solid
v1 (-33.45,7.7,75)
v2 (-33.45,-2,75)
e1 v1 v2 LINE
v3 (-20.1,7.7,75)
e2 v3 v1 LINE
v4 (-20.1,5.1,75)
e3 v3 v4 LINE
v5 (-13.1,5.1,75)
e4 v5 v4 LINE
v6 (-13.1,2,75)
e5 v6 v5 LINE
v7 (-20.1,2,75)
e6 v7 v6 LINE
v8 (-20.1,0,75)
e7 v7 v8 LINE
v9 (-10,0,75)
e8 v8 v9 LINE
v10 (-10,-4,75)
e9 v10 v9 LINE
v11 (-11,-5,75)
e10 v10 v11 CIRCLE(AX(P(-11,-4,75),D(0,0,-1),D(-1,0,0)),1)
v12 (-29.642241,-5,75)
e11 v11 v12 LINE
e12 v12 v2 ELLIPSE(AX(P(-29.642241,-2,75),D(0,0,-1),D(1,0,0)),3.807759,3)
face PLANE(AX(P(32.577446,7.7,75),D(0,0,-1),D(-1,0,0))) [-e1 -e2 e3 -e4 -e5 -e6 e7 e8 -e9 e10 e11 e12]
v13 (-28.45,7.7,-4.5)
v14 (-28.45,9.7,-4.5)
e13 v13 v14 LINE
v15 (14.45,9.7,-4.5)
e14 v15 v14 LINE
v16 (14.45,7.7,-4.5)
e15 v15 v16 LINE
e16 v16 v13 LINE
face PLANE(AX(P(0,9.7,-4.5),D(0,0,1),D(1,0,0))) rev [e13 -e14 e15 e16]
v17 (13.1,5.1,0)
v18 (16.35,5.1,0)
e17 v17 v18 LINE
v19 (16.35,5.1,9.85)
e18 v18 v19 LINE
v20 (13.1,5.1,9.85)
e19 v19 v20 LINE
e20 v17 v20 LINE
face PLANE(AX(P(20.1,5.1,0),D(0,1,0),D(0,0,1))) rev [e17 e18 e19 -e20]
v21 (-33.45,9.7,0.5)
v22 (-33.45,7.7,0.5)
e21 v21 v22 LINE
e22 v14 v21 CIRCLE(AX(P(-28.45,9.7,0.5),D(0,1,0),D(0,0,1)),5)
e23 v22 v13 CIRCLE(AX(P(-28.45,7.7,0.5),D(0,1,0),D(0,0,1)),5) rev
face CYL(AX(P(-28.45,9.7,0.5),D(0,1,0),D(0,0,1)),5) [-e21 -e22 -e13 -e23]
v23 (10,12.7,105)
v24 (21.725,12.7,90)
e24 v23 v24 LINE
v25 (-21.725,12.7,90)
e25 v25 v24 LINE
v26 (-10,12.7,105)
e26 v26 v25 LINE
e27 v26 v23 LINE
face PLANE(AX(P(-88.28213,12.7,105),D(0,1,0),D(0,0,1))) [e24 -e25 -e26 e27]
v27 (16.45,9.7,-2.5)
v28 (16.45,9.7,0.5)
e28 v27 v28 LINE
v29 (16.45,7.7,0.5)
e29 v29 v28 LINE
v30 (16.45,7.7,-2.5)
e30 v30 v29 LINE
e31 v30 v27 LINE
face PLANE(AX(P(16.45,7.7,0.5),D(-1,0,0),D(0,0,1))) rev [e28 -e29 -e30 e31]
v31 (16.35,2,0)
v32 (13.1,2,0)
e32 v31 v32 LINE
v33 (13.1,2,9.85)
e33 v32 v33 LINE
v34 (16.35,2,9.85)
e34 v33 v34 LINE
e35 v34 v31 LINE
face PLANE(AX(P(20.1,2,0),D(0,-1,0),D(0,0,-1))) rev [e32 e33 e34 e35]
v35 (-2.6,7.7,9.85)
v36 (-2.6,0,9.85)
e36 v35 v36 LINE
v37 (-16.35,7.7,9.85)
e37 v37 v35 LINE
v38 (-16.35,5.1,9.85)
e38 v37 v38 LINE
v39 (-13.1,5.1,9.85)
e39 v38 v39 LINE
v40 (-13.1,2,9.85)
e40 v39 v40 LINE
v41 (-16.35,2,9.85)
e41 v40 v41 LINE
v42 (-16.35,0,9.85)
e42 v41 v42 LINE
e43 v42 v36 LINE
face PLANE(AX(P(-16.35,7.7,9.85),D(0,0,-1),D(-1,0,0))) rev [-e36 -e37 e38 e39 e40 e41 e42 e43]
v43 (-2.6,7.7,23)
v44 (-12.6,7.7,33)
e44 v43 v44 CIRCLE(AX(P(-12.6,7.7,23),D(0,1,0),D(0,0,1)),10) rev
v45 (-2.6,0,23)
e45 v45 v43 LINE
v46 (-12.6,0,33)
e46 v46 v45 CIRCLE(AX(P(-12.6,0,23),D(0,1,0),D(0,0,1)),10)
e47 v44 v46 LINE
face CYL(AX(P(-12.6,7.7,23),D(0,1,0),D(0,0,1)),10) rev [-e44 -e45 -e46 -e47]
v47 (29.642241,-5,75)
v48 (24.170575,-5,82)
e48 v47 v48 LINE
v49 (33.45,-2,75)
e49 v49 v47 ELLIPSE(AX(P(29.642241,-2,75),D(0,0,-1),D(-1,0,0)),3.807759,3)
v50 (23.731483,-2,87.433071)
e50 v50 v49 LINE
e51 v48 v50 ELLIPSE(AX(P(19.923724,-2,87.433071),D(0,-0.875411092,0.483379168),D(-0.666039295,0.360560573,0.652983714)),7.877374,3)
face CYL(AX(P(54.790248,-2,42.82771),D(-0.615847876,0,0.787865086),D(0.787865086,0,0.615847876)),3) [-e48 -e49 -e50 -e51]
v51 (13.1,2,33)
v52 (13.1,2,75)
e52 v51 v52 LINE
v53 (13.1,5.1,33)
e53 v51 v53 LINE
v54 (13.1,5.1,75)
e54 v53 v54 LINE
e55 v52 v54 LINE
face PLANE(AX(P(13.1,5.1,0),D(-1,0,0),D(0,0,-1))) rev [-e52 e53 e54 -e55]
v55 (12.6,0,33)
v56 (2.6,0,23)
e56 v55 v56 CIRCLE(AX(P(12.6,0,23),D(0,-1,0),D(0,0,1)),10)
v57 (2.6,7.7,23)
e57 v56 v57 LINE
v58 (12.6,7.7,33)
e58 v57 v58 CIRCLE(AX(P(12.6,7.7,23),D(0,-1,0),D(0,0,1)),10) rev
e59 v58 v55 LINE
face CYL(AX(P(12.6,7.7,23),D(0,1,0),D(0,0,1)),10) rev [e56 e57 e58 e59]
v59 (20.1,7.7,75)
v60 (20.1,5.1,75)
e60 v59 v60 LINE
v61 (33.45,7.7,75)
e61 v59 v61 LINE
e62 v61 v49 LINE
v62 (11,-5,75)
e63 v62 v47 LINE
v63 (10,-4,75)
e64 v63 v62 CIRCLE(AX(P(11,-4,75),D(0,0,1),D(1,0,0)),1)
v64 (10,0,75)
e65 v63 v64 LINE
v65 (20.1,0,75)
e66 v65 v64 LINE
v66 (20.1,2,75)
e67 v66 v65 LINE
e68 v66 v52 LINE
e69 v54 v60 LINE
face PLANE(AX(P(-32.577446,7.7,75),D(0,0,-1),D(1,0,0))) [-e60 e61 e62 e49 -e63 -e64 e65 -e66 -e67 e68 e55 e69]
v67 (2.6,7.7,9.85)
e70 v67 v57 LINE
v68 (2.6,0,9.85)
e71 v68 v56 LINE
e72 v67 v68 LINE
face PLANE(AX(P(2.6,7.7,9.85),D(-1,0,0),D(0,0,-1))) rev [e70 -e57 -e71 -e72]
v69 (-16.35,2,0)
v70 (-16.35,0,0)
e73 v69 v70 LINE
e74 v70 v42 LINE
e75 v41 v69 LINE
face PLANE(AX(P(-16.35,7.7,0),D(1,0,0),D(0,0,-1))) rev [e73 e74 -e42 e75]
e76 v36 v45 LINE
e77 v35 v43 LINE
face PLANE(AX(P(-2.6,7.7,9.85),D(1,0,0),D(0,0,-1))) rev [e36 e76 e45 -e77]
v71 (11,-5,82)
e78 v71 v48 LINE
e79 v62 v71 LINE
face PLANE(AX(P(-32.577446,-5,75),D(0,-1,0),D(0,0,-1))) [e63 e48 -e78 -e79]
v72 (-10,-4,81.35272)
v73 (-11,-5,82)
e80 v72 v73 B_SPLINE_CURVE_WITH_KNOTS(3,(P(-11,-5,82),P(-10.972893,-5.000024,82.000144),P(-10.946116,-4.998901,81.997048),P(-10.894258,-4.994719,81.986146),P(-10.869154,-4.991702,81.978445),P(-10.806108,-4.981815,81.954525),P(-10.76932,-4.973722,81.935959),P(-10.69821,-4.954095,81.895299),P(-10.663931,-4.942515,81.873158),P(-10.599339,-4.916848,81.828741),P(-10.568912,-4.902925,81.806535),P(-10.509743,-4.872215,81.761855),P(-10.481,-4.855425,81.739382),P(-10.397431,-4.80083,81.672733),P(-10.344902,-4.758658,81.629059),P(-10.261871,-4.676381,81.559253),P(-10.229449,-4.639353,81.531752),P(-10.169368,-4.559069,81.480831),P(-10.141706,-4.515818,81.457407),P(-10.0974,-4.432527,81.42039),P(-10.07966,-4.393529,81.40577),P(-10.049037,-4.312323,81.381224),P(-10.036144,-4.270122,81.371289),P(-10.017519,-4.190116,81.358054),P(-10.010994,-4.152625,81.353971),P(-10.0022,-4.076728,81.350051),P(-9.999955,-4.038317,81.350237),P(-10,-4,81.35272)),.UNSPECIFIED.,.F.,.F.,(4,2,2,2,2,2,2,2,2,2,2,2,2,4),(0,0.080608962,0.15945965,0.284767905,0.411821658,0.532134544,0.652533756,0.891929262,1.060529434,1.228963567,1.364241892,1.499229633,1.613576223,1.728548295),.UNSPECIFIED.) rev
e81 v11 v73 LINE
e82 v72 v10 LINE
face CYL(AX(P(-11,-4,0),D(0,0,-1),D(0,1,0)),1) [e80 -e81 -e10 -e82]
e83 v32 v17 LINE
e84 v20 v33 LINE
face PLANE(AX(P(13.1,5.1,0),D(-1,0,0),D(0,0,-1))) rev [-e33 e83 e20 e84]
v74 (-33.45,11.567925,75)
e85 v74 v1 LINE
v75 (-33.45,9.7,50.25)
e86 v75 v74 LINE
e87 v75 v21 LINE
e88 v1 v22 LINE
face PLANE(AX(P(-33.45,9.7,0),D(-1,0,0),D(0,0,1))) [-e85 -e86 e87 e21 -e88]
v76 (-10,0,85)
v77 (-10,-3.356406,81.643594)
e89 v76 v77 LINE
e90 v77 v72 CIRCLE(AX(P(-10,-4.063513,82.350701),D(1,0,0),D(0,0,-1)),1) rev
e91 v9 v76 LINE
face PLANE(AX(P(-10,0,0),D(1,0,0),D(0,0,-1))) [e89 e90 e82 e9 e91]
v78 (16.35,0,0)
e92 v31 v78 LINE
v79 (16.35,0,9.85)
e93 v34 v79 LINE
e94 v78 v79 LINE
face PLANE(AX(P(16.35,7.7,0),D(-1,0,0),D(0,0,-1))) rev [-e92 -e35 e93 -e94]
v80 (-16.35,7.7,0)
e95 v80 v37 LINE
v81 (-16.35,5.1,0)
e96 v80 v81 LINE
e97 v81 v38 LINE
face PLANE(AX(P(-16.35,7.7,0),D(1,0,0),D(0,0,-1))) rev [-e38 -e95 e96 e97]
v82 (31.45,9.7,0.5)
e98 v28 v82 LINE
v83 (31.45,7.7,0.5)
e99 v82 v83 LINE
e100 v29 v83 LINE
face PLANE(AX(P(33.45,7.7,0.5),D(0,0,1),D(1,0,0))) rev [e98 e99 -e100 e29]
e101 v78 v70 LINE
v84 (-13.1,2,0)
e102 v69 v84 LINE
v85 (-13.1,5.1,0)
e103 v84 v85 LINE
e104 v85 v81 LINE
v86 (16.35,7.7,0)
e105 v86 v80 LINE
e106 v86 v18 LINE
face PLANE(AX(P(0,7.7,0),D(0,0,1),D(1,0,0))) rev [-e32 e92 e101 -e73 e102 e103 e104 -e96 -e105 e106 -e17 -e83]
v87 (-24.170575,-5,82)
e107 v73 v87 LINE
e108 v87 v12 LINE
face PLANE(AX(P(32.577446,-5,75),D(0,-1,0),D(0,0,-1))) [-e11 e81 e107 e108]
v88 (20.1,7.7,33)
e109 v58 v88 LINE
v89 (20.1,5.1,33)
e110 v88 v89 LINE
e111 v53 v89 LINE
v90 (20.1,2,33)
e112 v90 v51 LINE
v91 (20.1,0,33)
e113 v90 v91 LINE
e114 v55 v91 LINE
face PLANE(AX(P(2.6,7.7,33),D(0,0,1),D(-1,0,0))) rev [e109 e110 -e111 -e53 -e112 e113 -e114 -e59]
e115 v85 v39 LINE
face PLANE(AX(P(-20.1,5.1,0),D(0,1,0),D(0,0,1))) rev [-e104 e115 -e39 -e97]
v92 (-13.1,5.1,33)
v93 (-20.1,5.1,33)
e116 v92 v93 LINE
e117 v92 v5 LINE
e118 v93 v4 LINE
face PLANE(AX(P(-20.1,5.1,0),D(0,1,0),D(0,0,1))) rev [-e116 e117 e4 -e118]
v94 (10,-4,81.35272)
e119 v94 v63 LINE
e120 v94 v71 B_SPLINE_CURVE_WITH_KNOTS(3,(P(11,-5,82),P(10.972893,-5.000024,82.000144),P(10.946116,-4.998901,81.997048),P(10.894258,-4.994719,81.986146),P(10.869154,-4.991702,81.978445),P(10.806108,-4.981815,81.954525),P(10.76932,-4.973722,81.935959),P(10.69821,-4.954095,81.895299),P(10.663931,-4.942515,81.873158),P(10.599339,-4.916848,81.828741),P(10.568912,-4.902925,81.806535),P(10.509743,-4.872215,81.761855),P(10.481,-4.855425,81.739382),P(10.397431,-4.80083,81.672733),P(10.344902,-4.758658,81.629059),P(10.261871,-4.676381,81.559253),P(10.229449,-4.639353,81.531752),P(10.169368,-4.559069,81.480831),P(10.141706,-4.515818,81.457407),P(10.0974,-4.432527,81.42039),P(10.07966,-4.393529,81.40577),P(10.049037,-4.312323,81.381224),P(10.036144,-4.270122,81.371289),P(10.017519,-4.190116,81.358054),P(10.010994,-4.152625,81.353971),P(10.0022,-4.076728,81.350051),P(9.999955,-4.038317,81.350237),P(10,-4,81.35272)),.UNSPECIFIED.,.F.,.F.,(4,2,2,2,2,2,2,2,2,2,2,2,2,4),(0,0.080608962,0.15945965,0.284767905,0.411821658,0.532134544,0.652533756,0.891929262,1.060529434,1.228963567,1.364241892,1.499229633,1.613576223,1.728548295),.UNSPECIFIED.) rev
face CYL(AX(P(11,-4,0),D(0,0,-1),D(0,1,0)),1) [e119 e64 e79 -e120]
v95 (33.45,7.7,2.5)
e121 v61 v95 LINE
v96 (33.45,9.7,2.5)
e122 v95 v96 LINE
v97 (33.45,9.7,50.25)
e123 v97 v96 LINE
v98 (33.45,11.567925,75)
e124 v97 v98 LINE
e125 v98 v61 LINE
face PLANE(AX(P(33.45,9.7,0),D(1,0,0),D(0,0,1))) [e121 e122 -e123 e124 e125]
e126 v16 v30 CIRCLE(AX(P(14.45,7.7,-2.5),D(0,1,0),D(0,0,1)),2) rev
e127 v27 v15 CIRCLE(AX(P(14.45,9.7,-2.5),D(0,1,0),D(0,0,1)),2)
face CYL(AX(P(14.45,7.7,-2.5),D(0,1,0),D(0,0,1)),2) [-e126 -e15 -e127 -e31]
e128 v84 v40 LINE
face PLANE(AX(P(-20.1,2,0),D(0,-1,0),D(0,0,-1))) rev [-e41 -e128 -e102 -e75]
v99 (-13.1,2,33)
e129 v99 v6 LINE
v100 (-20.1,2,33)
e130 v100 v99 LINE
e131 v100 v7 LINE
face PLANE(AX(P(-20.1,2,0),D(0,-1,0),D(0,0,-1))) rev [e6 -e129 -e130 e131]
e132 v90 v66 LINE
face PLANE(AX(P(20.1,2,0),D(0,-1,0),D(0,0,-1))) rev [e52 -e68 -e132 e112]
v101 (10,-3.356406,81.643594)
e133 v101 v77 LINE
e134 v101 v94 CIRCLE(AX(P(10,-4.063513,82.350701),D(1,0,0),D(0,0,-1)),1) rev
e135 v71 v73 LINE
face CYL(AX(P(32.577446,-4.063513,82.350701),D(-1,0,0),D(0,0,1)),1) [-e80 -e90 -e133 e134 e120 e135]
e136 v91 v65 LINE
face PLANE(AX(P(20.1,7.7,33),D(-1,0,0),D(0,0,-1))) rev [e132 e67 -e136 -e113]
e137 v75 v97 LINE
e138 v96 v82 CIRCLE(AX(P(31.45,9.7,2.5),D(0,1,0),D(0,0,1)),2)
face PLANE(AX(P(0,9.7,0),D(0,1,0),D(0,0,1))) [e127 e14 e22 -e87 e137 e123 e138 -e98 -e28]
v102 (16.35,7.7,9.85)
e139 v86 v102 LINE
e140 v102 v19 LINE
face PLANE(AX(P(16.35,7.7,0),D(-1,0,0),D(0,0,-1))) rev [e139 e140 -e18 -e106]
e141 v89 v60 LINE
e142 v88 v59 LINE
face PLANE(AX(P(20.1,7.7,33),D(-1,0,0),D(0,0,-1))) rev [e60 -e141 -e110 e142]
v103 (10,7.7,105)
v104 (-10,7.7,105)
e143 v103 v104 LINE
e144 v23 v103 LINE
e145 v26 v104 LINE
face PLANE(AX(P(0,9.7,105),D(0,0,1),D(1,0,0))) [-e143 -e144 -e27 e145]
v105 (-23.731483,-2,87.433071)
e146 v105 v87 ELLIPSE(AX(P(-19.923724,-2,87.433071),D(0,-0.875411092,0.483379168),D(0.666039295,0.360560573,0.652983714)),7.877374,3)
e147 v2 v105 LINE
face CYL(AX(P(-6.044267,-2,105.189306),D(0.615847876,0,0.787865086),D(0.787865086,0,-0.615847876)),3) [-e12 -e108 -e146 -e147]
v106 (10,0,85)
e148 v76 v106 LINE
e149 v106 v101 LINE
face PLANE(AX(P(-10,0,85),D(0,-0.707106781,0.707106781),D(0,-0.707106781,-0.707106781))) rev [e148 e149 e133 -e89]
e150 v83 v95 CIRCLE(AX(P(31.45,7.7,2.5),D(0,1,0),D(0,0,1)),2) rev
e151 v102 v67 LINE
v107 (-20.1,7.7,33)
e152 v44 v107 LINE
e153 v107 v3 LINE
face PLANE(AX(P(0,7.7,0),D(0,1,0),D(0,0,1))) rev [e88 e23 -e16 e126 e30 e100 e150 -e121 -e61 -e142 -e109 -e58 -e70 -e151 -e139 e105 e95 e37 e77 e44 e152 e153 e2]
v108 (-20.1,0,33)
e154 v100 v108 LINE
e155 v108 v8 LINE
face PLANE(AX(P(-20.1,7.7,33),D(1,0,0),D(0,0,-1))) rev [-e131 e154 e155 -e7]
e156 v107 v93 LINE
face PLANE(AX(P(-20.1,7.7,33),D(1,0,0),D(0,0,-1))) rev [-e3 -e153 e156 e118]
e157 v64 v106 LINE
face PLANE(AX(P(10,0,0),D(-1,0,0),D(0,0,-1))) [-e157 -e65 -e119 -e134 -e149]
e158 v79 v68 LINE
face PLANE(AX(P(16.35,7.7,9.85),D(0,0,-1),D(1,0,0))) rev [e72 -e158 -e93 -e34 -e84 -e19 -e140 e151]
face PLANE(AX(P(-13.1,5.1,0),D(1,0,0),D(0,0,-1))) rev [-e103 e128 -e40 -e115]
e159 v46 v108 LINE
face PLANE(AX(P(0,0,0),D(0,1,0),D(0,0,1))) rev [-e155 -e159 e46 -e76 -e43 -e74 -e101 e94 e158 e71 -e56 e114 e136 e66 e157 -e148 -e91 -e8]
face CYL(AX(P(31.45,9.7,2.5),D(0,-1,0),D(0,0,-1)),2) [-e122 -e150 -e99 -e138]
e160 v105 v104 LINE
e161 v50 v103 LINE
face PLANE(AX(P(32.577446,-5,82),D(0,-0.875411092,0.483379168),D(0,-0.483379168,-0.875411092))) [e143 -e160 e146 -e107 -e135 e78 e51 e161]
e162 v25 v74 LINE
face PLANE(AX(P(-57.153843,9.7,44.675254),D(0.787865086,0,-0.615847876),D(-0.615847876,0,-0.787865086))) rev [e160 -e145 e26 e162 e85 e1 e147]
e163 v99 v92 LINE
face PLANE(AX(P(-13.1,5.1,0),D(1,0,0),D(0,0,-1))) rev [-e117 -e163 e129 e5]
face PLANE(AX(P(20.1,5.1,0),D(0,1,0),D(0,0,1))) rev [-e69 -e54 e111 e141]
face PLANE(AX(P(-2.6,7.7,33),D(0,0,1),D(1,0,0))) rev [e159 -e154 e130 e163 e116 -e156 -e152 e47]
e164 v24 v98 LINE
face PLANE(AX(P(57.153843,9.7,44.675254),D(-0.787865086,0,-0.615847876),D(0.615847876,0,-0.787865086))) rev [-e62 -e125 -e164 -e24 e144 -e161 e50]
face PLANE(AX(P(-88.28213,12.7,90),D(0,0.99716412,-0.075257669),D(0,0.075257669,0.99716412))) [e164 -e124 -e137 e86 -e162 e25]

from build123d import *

# Parameters (mm, degrees)
BOSS_EXTRUDE1_DEPTH     = 7.7
SKETCH2_W               = 7
SKETCH2_H               = 3.1
CUT_EXTRUDE1_DEPTH      = 79.027559234
FILLET1_R               = 10
BOSS_EXTRUDE2_DEPTH     = 2
BOSS_EXTRUDE3_DEPTH     = 33.45
BOSS_EXTRUDE4_REACH     = 112.929
CUT_EXTRUDE2_DEPTH      = 111.928772192
CUT_EXTRUDE2_DEPTH_BACK = 111.928772192
CUT_EXTRUDE3_DEPTH      = 10
FILLET3_R               = 1
FILLET5_R               = 3
SKETCH8_W               = 17
SKETCH8_H               = 5
CUT_EXTRUDE4_DEPTH      = 2
FILLET6_R               = 5
FILLET7_R               = 2


with BuildPart() as part:
    # Sketch1 → Boss-Extrude1 (new body)
    with BuildSketch(Plane(origin=(0, 0, 0), x_dir=(1, 0, 0), z_dir=(0, 1, 0))):
        Polygon((0, 0), (-16.35, 0), (-16.35, -9.85), (-2.6, -9.85), (-2.6, -33), (-20.1, -33), (-20.1, -75), (0, -75), align=None)
    extrude(amount=BOSS_EXTRUDE1_DEPTH)

    # Sketch2 → Cut-Extrude1 (cut, through all)
    with BuildSketch(Plane.XY.offset(75)):
        with Locations((-16.6, 3.55)):
            Rectangle(SKETCH2_W, SKETCH2_H)
    extrude(amount=-CUT_EXTRUDE1_DEPTH, mode=Mode.SUBTRACT)

    # Fillet1
    fillet1_edges = [part.edges().sort_by_distance(p)[0] for p in [
        (-2.6, 3.85, 33),
    ]]
    fillet(fillet1_edges, radius=FILLET1_R)

    # Sketch3 → Boss-Extrude2 (add)
    with BuildSketch(Plane(origin=(0, 7.7, 0), x_dir=(1, 0, 0), z_dir=(0, 1, 0))):
        Polygon((0, 4.5), (-33.45, 4.5), (-33.45, -75), (-10, -105), (0, -105), align=None)
    extrude(amount=BOSS_EXTRUDE2_DEPTH)

    # Sketch4 → Boss-Extrude3 (add)
    with BuildSketch(Plane(origin=(0, 0, 0), x_dir=(0, 0, -1), z_dir=(1, 0, 0))):
        Polygon((-105, 9.7), (-105, 12.7), (-90, 12.7), (-50.25, 9.7), align=None)
    extrude(amount=-BOSS_EXTRUDE3_DEPTH)

    # Boss-Extrude4: up to this face of the body (flat: up to its plane)
    boss_extrude4_end = Plane(part.part.faces().sort_by_distance((0, 5.848980441, 46.191947566))[0])
    # Sketch5 → Boss-Extrude4 (add, up to the picked face)
    with BuildSketch(Plane.ZY.offset(33.45), mode=Mode.PRIVATE) as boss_extrude4_sk1:
        Polygon((75, 7.7), (75, -5), (82, -5), (105, 7.7), align=None)
    boss_extrude4_tool1 = split(extrude(boss_extrude4_sk1.sketch, amount=-BOSS_EXTRUDE4_REACH, mode=Mode.PRIVATE), bisect_by=boss_extrude4_end, keep=Keep.BOTH, mode=Mode.PRIVATE)
    add(boss_extrude4_tool1.solids().sort_by(Axis((-33.45, 2.665766, 85.441441), (1, 0, 0)))[0])

    # Sketch6 → Cut-Extrude2 (cut, two sides: drawn at the far end of the back side and taken through both)
    with BuildSketch(Plane(origin=(0, 7.7, 0), x_dir=(1, 0, 0), z_dir=(0, 1, 0)).offset(-CUT_EXTRUDE2_DEPTH_BACK)):
        Polygon((-33.45, -75), (-10, -105), (-33.45, -105), align=None)
    extrude(amount=CUT_EXTRUDE2_DEPTH + CUT_EXTRUDE2_DEPTH_BACK, mode=Mode.SUBTRACT)

    # Sketch7 → Cut-Extrude3 (cut)
    with BuildSketch(Plane(origin=(0, 0, 0), x_dir=(0, 0, -1), z_dir=(1, 0, 0))):
        Polygon((-75, 0), (-85, 0), (-80, -5), (-75, -5), align=None)
    extrude(amount=-CUT_EXTRUDE3_DEPTH, mode=Mode.SUBTRACT)

    # Fillet3
    # the kernel refuses this fillet: 1 mm, written as the material it takes off along each edge
    with BuildSketch(Plane(origin=(5.810983209, -5, 80), x_dir=(0, 0, 1), z_dir=(-1, 0, 0))) as fillet3_piece_1:
        with BuildLine():
            CenterArc((2.350701034, 0.936487472), FILLET3_R, 135, 114.469800521)
            Line((1.643594253, 1.643594253), (1.629452117, 1.657736389))
            Line((1.629452117, 1.657736389), (-0.014142136, 0.014142136))
            Line((-0.014142136, 0.014142136), (0, -0.02))
            ThreePointArc((0, -0.02), (1, -0.02), (1.992985979, -0.018729749))
            Line((1.992985979, -0.018729749), (2, 0))
        make_face()
    extrude(amount=15.810983209, mode=Mode.SUBTRACT)
    with BuildSketch(Plane(origin=(-10, -5, 82.5), x_dir=(-1, 0, 0), z_dir=(0, 0, -1))) as fillet3_piece_2_section:
        with BuildLine():
            CenterArc((FILLET3_R, FILLET3_R), FILLET3_R, 180, 90)
            Line((0, FILLET3_R), (-FILLET3_R * 0.02, FILLET3_R))
            Line((-FILLET3_R * 0.02, FILLET3_R), (-FILLET3_R * 0.02, -FILLET3_R * 0.02))
            Line((-FILLET3_R * 0.02, -FILLET3_R * 0.02), (FILLET3_R, -FILLET3_R * 0.02))
            Line((FILLET3_R, -FILLET3_R * 0.02), (FILLET3_R, 0))
        make_face()
    fillet3_piece_2 = extrude(amount=10, mode=Mode.PRIVATE)
    fillet3_piece_2 = split(fillet3_piece_2, bisect_by=Plane(origin=(-10.222841489, -6.700692184, 78.299307816), z_dir=(0, 0.7071067811865466, -0.7071067811865485)), keep=Keep.TOP, mode=Mode.PRIVATE)
    add(fillet3_piece_2, mode=Mode.SUBTRACT)
    with BuildSketch(Plane(origin=(5.810983209, -5, 80), x_dir=(0, 0, 1), z_dir=(-1, 0, 0))) as fillet3_piece_3a_section:
        with BuildLine():
            CenterArc((2.350701034, 0.936487472), FILLET3_R, 135, 114.469800521)
            Line((1.643594253, 1.643594253), (1.629452117, 1.657736389))
            Line((1.629452117, 1.657736389), (-0.014142136, 0.014142136))
            Line((-0.014142136, 0.014142136), (0, -0.02))
            ThreePointArc((0, -0.02), (1, -0.02), (1.992985979, -0.018729749))
            Line((1.992985979, -0.018729749), (2, 0))
        make_face()
    fillet3_piece_3a = extrude(amount=21.621966417, mode=Mode.PRIVATE)
    fillet3_piece_3a = split(fillet3_piece_3a, bisect_by=Plane(origin=(-10, -4.567151235, 80.996776665), z_dir=(-1, 0, 0)), keep=Keep.TOP, mode=Mode.PRIVATE)
    with BuildSketch(Plane(origin=(-10, -5, 82.5), x_dir=(-1, 0, 0), z_dir=(0, 0, -1))) as fillet3_piece_3b_section:
        with BuildLine():
            CenterArc((FILLET3_R, FILLET3_R), FILLET3_R, 180, 90)
            Line((0, FILLET3_R), (-FILLET3_R * 0.02, FILLET3_R))
            Line((-FILLET3_R * 0.02, FILLET3_R), (-FILLET3_R * 0.02, -FILLET3_R * 0.02))
            Line((-FILLET3_R * 0.02, -FILLET3_R * 0.02), (FILLET3_R, -FILLET3_R * 0.02))
            Line((FILLET3_R, -FILLET3_R * 0.02), (FILLET3_R, 0))
        make_face()
    fillet3_piece_3b = extrude(amount=10, mode=Mode.PRIVATE)
    fillet3_piece_3b = split(fillet3_piece_3b, bisect_by=Plane(origin=(-10.238471404, -4.220535034, 80.779464966), z_dir=(0, -0.7071067811865466, 0.7071067811865485)), keep=Keep.TOP, mode=Mode.PRIVATE)
    fillet3_piece_3 = fillet3_piece_3a & fillet3_piece_3b
    add(fillet3_piece_3, mode=Mode.SUBTRACT)

    # Mirror1: part across plane


with BuildPart() as part_1:
    add(part.part)
    add(part.part.mirror(Plane(origin=(0, 7.7, 75), x_dir=(0, 0, 1), z_dir=(-1, 0, 0))))

    # Fillet5
    # the kernel refuses this fillet: 3 mm, written as the material it takes off along each edge
    with BuildSketch(Plane(origin=(-38.068859068, -5, 69.091011854), x_dir=(0, 1, 0), z_dir=(0.6158478756904763, 0, 0.7878650861711843)), Plane(origin=(38.068859068, -5, 69.091011854), x_dir=(-0.7878650861711843, 0, -0.6158478756904764), z_dir=(-0.6158478756904763, 0, 0.7878650861711843))) as fillet5_piece_1:
        with BuildLine():
            CenterArc((FILLET5_R, -FILLET5_R), FILLET5_R, 90, 90)
            Line((0, -FILLET5_R), (0, 0))
            Line((0, 0), (FILLET5_R, 0))
        make_face()
    extrude(amount=23.884769896, mode=Mode.SUBTRACT)

    # Sketch8 → Cut-Extrude4 (cut)
    with BuildSketch(Plane(origin=(0, 9.7, 0), x_dir=(1, 0, 0), z_dir=(0, 1, 0))):
        with Locations((24.95, 2)):
            Rectangle(SKETCH8_W, SKETCH8_H)
    extrude(amount=-CUT_EXTRUDE4_DEPTH, mode=Mode.SUBTRACT)

    # Fillet6
    fillet6_edges = [part_1.edges().sort_by_distance(p)[0] for p in [
        (-33.45, 8.7, -4.5),
    ]]
    fillet(fillet6_edges, radius=FILLET6_R)

    # Fillet7
    fillet7_edges = [part_1.edges().sort_by_distance(p)[0] for p in [
        (16.45, 8.7, -4.5),
        (33.45, 8.7, 0.5),
    ]]
    fillet(fillet7_edges, radius=FILLET7_R)


solid = part_1.part
